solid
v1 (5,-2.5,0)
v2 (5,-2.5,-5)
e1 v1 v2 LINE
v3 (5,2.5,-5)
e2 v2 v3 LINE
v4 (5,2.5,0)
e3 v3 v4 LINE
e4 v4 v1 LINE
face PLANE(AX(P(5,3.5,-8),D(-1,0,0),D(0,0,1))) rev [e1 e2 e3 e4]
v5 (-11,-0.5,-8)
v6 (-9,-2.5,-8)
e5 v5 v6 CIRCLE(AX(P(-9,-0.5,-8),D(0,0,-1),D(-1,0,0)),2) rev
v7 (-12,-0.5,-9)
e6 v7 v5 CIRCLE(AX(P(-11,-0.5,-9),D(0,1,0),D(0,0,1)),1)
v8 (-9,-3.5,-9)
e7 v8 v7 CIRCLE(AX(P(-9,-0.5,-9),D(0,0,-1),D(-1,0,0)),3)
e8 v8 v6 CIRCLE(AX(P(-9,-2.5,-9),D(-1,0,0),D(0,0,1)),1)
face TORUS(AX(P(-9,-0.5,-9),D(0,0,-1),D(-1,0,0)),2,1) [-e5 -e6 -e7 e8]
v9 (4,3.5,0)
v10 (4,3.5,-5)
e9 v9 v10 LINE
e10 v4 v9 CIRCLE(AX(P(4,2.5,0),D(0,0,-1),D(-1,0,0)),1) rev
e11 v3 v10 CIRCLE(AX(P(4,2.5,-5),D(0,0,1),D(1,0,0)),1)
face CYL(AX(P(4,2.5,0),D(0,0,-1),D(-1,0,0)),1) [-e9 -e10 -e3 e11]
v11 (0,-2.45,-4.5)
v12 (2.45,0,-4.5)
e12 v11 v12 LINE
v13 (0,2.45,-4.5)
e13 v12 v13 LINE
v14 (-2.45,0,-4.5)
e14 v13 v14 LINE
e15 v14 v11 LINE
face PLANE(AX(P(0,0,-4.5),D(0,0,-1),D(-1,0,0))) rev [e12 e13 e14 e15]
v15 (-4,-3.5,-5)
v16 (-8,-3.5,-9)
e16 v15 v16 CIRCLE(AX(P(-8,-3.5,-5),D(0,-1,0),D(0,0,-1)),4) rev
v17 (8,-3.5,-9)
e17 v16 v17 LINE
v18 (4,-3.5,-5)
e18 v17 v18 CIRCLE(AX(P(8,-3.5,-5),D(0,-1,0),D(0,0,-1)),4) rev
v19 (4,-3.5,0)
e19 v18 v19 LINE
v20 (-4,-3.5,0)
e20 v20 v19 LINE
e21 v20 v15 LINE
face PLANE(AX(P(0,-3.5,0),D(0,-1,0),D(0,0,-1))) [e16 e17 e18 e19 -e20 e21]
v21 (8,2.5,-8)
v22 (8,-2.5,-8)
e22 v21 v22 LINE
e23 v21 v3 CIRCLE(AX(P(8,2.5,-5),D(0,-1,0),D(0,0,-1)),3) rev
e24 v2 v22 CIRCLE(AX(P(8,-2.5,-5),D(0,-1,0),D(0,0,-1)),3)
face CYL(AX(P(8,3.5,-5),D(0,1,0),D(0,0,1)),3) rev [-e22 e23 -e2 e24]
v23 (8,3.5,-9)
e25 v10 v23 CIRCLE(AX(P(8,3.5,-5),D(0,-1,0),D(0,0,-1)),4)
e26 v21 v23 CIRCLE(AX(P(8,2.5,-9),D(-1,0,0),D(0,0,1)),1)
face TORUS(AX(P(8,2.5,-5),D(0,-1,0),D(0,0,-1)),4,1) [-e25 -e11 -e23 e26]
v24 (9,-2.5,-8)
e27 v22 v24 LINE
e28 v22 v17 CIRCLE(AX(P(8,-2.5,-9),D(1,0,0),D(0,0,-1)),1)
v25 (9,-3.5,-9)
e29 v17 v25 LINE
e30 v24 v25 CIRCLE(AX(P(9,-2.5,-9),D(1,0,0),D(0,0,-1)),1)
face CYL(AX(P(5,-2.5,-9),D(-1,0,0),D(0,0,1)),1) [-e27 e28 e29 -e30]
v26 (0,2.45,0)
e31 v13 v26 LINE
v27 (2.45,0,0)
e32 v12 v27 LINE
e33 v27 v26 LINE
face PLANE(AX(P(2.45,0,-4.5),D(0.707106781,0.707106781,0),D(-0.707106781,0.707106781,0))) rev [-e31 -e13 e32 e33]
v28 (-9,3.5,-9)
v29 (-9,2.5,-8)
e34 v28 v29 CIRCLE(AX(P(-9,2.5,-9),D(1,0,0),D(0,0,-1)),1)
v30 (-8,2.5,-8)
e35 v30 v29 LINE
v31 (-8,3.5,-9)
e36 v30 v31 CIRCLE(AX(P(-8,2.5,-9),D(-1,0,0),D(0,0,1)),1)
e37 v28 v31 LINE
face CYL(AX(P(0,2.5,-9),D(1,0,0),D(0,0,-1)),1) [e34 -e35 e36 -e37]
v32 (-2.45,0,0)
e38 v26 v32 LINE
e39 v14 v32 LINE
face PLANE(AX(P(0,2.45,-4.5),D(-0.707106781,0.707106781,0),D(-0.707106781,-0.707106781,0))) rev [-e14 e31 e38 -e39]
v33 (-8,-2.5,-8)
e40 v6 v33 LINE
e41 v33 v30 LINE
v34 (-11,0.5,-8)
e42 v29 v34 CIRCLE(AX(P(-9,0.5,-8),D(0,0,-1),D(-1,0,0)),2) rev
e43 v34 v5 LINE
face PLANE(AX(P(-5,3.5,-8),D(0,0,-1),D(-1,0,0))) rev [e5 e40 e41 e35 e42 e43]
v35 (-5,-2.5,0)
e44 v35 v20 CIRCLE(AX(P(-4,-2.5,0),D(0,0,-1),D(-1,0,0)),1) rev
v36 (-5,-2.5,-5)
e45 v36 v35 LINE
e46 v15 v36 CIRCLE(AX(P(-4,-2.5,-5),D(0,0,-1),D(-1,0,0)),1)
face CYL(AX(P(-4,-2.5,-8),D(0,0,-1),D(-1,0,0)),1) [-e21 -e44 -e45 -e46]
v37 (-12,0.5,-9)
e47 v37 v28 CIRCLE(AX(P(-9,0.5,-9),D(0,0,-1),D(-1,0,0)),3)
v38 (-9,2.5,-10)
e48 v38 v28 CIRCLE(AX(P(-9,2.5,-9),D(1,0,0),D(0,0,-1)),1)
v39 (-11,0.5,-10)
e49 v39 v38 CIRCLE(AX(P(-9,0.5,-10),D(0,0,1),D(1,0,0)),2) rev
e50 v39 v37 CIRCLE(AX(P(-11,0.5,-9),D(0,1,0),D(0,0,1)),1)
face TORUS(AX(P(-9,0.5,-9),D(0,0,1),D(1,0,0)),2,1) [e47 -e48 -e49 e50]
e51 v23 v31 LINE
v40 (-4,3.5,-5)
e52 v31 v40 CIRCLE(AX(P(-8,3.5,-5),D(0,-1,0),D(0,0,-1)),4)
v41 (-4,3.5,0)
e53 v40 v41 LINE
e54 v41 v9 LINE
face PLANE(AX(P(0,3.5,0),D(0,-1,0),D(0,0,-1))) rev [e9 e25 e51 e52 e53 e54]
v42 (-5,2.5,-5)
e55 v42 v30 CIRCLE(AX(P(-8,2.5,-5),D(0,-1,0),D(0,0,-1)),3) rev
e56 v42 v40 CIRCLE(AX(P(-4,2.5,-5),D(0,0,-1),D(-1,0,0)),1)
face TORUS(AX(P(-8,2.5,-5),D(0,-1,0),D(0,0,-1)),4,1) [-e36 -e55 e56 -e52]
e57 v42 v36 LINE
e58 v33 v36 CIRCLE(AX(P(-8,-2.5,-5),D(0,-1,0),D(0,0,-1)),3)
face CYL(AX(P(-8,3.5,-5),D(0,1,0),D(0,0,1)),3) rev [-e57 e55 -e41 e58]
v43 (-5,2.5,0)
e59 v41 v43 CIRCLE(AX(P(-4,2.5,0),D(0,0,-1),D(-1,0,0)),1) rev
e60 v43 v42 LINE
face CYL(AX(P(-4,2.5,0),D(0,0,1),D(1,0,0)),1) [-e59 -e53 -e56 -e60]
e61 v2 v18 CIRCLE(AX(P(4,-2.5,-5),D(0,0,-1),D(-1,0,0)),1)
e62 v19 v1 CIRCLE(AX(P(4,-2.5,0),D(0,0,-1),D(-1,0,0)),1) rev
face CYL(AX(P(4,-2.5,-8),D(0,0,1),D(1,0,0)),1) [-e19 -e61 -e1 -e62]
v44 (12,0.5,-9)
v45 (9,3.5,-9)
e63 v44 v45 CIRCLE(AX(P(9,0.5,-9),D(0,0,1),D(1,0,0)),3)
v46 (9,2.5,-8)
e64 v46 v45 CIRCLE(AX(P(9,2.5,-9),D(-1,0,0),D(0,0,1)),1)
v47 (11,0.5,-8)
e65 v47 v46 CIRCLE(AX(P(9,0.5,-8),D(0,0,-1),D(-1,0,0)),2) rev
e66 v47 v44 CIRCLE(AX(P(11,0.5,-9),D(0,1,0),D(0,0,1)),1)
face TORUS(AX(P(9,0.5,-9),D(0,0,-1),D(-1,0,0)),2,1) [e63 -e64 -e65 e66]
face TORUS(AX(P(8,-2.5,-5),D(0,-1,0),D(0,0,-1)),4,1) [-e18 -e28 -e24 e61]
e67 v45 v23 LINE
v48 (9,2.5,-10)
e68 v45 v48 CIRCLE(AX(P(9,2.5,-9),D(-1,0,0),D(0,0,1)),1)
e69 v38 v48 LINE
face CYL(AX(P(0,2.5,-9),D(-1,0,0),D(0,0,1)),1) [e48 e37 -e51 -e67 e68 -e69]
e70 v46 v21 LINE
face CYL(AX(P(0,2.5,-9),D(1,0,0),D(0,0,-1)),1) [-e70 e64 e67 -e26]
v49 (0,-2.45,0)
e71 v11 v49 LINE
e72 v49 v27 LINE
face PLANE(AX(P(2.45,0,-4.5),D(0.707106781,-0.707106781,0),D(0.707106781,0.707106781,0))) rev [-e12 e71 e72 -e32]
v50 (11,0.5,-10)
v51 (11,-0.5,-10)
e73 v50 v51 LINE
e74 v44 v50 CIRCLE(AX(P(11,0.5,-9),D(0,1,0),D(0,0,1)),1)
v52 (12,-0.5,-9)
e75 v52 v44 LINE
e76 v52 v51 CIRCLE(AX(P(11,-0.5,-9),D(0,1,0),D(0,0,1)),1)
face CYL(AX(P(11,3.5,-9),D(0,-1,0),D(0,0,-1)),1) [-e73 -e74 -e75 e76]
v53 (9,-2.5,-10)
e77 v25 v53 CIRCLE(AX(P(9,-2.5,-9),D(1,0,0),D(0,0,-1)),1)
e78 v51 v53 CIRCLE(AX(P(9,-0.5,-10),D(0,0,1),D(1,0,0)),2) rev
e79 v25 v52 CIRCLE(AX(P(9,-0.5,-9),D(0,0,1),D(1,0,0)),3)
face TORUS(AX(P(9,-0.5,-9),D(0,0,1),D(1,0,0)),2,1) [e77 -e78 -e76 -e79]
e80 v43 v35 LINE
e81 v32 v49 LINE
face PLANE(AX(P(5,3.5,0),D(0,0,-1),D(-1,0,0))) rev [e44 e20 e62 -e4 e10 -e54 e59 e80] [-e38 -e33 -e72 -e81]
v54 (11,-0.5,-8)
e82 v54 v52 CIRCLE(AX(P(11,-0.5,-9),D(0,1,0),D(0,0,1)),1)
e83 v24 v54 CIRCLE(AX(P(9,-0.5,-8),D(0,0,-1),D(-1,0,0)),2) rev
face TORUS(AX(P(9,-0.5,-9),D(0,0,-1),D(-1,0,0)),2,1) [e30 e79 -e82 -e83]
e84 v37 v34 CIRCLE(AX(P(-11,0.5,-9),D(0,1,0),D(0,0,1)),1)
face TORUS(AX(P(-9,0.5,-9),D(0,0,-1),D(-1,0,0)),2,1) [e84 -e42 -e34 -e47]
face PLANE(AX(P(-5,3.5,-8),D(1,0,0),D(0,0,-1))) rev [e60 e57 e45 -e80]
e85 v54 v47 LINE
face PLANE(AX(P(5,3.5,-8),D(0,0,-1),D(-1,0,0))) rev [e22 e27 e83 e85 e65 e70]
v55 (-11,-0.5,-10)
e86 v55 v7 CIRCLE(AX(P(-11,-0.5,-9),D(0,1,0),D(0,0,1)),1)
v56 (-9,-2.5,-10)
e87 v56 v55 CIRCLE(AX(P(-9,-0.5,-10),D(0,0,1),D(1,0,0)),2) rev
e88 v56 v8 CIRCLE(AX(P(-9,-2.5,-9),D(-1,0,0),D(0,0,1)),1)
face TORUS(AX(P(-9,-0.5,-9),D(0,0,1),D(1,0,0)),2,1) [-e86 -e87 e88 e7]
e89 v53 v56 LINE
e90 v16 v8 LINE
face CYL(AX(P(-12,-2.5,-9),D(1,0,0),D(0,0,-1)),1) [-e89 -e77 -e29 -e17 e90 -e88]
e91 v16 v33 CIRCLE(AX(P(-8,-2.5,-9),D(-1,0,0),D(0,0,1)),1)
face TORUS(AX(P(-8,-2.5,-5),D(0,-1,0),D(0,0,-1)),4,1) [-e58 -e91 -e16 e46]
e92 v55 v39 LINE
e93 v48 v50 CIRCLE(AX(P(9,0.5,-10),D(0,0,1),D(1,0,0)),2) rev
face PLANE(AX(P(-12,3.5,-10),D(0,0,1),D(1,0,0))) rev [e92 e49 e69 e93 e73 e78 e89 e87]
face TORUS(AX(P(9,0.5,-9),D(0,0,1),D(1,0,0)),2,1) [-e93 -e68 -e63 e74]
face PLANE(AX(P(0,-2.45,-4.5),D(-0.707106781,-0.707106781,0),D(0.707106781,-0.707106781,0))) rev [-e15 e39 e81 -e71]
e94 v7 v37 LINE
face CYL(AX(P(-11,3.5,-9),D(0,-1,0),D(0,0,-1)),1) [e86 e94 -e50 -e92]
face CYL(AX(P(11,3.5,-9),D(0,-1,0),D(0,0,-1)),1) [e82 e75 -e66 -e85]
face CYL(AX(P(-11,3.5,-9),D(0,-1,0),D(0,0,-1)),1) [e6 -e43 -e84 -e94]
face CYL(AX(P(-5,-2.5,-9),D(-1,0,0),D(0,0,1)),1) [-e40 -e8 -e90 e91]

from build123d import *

# Parameters (mm, degrees)
BOSS_EXTRUDE1_DEPTH = 3.5
FILLET1_R           = 3
FILLET2_R           = 3
FILLET3_R           = 1
CUT_EXTRUDE1_DEPTH  = 4.5


with BuildPart() as part:
    # Sketch1 → Boss-Extrude1 (new, symmetric)
    with BuildSketch(Plane(origin=(0, 0, 0), x_dir=(1, 0, 0), z_dir=(0, 1, 0))):
        Polygon((5, 0), (-5, 0), (-5, 8), (-12, 8), (-12, 10), (12, 10), (12, 8), (5, 8), align=None)
    extrude(amount=BOSS_EXTRUDE1_DEPTH, both=True)

    # Fillet1
    fillet1_edges = [part.edges().sort_by_distance(p)[0] for p in [
        (12, 3.5, -9),
        (-12, 3.5, -9),
        (-12, -3.5, -9),
        (12, -3.5, -9),
    ]]
    fillet(fillet1_edges, radius=FILLET1_R)

    # Fillet2
    fillet2_edges = [part.edges().sort_by_distance(p)[0] for p in [
        (-5, 0, -8),
        (5, 0, -8),
    ]]
    fillet(fillet2_edges, radius=FILLET2_R)

    # Fillet3
    fillet3_edges = [part.edges().sort_by_distance(p)[0] for p in [
        (5, 3.5, -2.5),
        (5, -3.5, -2.5),
        (5.878679656, -3.5, -7.121320344),
        (11.121320344, -2.621320344, -8),
        (11.121320344, 2.621320344, -8),
        (-5, -3.5, -2.5),
        (-5.878679656, -3.5, -7.121320344),
        (-11.121320344, -2.621320344, -8),
        (-11.121320344, 2.621320344, -8),
        (-5, 3.5, -2.5),
        (5.878679656, 3.5, -7.121320344),
        (-5.878679656, 3.5, -7.121320344),
        (0, 3.5, -10),
        (-11.121320344, 2.621320344, -10),
        (-11.121320344, -2.621320344, -10),
        (0, -3.5, -10),
        (11.121320344, -2.621320344, -10),
        (11.121320344, 2.621320344, -10),
        (12, 0, -8),
        (-12, 0, -8),
        (12, 0, -10),
        (-12, 0, -10),
        (8.5, -3.5, -8),
        (8.5, 3.5, -8),
        (-8.5, -3.5, -8),
        (-8.5, 3.5, -8),
    ]]
    fillet(fillet3_edges, radius=FILLET3_R - 0.0001)  # a hair under: the kernel refuses the full size

    # Sketch3 → Cut-Extrude1 (cut)
    with BuildSketch(Plane.XY):
        Polygon((2.45, 0), (0, 2.45), (-2.45, 0), (0, -2.45), align=None)
    extrude(amount=-CUT_EXTRUDE1_DEPTH, mode=Mode.SUBTRACT)


solid = part.part
